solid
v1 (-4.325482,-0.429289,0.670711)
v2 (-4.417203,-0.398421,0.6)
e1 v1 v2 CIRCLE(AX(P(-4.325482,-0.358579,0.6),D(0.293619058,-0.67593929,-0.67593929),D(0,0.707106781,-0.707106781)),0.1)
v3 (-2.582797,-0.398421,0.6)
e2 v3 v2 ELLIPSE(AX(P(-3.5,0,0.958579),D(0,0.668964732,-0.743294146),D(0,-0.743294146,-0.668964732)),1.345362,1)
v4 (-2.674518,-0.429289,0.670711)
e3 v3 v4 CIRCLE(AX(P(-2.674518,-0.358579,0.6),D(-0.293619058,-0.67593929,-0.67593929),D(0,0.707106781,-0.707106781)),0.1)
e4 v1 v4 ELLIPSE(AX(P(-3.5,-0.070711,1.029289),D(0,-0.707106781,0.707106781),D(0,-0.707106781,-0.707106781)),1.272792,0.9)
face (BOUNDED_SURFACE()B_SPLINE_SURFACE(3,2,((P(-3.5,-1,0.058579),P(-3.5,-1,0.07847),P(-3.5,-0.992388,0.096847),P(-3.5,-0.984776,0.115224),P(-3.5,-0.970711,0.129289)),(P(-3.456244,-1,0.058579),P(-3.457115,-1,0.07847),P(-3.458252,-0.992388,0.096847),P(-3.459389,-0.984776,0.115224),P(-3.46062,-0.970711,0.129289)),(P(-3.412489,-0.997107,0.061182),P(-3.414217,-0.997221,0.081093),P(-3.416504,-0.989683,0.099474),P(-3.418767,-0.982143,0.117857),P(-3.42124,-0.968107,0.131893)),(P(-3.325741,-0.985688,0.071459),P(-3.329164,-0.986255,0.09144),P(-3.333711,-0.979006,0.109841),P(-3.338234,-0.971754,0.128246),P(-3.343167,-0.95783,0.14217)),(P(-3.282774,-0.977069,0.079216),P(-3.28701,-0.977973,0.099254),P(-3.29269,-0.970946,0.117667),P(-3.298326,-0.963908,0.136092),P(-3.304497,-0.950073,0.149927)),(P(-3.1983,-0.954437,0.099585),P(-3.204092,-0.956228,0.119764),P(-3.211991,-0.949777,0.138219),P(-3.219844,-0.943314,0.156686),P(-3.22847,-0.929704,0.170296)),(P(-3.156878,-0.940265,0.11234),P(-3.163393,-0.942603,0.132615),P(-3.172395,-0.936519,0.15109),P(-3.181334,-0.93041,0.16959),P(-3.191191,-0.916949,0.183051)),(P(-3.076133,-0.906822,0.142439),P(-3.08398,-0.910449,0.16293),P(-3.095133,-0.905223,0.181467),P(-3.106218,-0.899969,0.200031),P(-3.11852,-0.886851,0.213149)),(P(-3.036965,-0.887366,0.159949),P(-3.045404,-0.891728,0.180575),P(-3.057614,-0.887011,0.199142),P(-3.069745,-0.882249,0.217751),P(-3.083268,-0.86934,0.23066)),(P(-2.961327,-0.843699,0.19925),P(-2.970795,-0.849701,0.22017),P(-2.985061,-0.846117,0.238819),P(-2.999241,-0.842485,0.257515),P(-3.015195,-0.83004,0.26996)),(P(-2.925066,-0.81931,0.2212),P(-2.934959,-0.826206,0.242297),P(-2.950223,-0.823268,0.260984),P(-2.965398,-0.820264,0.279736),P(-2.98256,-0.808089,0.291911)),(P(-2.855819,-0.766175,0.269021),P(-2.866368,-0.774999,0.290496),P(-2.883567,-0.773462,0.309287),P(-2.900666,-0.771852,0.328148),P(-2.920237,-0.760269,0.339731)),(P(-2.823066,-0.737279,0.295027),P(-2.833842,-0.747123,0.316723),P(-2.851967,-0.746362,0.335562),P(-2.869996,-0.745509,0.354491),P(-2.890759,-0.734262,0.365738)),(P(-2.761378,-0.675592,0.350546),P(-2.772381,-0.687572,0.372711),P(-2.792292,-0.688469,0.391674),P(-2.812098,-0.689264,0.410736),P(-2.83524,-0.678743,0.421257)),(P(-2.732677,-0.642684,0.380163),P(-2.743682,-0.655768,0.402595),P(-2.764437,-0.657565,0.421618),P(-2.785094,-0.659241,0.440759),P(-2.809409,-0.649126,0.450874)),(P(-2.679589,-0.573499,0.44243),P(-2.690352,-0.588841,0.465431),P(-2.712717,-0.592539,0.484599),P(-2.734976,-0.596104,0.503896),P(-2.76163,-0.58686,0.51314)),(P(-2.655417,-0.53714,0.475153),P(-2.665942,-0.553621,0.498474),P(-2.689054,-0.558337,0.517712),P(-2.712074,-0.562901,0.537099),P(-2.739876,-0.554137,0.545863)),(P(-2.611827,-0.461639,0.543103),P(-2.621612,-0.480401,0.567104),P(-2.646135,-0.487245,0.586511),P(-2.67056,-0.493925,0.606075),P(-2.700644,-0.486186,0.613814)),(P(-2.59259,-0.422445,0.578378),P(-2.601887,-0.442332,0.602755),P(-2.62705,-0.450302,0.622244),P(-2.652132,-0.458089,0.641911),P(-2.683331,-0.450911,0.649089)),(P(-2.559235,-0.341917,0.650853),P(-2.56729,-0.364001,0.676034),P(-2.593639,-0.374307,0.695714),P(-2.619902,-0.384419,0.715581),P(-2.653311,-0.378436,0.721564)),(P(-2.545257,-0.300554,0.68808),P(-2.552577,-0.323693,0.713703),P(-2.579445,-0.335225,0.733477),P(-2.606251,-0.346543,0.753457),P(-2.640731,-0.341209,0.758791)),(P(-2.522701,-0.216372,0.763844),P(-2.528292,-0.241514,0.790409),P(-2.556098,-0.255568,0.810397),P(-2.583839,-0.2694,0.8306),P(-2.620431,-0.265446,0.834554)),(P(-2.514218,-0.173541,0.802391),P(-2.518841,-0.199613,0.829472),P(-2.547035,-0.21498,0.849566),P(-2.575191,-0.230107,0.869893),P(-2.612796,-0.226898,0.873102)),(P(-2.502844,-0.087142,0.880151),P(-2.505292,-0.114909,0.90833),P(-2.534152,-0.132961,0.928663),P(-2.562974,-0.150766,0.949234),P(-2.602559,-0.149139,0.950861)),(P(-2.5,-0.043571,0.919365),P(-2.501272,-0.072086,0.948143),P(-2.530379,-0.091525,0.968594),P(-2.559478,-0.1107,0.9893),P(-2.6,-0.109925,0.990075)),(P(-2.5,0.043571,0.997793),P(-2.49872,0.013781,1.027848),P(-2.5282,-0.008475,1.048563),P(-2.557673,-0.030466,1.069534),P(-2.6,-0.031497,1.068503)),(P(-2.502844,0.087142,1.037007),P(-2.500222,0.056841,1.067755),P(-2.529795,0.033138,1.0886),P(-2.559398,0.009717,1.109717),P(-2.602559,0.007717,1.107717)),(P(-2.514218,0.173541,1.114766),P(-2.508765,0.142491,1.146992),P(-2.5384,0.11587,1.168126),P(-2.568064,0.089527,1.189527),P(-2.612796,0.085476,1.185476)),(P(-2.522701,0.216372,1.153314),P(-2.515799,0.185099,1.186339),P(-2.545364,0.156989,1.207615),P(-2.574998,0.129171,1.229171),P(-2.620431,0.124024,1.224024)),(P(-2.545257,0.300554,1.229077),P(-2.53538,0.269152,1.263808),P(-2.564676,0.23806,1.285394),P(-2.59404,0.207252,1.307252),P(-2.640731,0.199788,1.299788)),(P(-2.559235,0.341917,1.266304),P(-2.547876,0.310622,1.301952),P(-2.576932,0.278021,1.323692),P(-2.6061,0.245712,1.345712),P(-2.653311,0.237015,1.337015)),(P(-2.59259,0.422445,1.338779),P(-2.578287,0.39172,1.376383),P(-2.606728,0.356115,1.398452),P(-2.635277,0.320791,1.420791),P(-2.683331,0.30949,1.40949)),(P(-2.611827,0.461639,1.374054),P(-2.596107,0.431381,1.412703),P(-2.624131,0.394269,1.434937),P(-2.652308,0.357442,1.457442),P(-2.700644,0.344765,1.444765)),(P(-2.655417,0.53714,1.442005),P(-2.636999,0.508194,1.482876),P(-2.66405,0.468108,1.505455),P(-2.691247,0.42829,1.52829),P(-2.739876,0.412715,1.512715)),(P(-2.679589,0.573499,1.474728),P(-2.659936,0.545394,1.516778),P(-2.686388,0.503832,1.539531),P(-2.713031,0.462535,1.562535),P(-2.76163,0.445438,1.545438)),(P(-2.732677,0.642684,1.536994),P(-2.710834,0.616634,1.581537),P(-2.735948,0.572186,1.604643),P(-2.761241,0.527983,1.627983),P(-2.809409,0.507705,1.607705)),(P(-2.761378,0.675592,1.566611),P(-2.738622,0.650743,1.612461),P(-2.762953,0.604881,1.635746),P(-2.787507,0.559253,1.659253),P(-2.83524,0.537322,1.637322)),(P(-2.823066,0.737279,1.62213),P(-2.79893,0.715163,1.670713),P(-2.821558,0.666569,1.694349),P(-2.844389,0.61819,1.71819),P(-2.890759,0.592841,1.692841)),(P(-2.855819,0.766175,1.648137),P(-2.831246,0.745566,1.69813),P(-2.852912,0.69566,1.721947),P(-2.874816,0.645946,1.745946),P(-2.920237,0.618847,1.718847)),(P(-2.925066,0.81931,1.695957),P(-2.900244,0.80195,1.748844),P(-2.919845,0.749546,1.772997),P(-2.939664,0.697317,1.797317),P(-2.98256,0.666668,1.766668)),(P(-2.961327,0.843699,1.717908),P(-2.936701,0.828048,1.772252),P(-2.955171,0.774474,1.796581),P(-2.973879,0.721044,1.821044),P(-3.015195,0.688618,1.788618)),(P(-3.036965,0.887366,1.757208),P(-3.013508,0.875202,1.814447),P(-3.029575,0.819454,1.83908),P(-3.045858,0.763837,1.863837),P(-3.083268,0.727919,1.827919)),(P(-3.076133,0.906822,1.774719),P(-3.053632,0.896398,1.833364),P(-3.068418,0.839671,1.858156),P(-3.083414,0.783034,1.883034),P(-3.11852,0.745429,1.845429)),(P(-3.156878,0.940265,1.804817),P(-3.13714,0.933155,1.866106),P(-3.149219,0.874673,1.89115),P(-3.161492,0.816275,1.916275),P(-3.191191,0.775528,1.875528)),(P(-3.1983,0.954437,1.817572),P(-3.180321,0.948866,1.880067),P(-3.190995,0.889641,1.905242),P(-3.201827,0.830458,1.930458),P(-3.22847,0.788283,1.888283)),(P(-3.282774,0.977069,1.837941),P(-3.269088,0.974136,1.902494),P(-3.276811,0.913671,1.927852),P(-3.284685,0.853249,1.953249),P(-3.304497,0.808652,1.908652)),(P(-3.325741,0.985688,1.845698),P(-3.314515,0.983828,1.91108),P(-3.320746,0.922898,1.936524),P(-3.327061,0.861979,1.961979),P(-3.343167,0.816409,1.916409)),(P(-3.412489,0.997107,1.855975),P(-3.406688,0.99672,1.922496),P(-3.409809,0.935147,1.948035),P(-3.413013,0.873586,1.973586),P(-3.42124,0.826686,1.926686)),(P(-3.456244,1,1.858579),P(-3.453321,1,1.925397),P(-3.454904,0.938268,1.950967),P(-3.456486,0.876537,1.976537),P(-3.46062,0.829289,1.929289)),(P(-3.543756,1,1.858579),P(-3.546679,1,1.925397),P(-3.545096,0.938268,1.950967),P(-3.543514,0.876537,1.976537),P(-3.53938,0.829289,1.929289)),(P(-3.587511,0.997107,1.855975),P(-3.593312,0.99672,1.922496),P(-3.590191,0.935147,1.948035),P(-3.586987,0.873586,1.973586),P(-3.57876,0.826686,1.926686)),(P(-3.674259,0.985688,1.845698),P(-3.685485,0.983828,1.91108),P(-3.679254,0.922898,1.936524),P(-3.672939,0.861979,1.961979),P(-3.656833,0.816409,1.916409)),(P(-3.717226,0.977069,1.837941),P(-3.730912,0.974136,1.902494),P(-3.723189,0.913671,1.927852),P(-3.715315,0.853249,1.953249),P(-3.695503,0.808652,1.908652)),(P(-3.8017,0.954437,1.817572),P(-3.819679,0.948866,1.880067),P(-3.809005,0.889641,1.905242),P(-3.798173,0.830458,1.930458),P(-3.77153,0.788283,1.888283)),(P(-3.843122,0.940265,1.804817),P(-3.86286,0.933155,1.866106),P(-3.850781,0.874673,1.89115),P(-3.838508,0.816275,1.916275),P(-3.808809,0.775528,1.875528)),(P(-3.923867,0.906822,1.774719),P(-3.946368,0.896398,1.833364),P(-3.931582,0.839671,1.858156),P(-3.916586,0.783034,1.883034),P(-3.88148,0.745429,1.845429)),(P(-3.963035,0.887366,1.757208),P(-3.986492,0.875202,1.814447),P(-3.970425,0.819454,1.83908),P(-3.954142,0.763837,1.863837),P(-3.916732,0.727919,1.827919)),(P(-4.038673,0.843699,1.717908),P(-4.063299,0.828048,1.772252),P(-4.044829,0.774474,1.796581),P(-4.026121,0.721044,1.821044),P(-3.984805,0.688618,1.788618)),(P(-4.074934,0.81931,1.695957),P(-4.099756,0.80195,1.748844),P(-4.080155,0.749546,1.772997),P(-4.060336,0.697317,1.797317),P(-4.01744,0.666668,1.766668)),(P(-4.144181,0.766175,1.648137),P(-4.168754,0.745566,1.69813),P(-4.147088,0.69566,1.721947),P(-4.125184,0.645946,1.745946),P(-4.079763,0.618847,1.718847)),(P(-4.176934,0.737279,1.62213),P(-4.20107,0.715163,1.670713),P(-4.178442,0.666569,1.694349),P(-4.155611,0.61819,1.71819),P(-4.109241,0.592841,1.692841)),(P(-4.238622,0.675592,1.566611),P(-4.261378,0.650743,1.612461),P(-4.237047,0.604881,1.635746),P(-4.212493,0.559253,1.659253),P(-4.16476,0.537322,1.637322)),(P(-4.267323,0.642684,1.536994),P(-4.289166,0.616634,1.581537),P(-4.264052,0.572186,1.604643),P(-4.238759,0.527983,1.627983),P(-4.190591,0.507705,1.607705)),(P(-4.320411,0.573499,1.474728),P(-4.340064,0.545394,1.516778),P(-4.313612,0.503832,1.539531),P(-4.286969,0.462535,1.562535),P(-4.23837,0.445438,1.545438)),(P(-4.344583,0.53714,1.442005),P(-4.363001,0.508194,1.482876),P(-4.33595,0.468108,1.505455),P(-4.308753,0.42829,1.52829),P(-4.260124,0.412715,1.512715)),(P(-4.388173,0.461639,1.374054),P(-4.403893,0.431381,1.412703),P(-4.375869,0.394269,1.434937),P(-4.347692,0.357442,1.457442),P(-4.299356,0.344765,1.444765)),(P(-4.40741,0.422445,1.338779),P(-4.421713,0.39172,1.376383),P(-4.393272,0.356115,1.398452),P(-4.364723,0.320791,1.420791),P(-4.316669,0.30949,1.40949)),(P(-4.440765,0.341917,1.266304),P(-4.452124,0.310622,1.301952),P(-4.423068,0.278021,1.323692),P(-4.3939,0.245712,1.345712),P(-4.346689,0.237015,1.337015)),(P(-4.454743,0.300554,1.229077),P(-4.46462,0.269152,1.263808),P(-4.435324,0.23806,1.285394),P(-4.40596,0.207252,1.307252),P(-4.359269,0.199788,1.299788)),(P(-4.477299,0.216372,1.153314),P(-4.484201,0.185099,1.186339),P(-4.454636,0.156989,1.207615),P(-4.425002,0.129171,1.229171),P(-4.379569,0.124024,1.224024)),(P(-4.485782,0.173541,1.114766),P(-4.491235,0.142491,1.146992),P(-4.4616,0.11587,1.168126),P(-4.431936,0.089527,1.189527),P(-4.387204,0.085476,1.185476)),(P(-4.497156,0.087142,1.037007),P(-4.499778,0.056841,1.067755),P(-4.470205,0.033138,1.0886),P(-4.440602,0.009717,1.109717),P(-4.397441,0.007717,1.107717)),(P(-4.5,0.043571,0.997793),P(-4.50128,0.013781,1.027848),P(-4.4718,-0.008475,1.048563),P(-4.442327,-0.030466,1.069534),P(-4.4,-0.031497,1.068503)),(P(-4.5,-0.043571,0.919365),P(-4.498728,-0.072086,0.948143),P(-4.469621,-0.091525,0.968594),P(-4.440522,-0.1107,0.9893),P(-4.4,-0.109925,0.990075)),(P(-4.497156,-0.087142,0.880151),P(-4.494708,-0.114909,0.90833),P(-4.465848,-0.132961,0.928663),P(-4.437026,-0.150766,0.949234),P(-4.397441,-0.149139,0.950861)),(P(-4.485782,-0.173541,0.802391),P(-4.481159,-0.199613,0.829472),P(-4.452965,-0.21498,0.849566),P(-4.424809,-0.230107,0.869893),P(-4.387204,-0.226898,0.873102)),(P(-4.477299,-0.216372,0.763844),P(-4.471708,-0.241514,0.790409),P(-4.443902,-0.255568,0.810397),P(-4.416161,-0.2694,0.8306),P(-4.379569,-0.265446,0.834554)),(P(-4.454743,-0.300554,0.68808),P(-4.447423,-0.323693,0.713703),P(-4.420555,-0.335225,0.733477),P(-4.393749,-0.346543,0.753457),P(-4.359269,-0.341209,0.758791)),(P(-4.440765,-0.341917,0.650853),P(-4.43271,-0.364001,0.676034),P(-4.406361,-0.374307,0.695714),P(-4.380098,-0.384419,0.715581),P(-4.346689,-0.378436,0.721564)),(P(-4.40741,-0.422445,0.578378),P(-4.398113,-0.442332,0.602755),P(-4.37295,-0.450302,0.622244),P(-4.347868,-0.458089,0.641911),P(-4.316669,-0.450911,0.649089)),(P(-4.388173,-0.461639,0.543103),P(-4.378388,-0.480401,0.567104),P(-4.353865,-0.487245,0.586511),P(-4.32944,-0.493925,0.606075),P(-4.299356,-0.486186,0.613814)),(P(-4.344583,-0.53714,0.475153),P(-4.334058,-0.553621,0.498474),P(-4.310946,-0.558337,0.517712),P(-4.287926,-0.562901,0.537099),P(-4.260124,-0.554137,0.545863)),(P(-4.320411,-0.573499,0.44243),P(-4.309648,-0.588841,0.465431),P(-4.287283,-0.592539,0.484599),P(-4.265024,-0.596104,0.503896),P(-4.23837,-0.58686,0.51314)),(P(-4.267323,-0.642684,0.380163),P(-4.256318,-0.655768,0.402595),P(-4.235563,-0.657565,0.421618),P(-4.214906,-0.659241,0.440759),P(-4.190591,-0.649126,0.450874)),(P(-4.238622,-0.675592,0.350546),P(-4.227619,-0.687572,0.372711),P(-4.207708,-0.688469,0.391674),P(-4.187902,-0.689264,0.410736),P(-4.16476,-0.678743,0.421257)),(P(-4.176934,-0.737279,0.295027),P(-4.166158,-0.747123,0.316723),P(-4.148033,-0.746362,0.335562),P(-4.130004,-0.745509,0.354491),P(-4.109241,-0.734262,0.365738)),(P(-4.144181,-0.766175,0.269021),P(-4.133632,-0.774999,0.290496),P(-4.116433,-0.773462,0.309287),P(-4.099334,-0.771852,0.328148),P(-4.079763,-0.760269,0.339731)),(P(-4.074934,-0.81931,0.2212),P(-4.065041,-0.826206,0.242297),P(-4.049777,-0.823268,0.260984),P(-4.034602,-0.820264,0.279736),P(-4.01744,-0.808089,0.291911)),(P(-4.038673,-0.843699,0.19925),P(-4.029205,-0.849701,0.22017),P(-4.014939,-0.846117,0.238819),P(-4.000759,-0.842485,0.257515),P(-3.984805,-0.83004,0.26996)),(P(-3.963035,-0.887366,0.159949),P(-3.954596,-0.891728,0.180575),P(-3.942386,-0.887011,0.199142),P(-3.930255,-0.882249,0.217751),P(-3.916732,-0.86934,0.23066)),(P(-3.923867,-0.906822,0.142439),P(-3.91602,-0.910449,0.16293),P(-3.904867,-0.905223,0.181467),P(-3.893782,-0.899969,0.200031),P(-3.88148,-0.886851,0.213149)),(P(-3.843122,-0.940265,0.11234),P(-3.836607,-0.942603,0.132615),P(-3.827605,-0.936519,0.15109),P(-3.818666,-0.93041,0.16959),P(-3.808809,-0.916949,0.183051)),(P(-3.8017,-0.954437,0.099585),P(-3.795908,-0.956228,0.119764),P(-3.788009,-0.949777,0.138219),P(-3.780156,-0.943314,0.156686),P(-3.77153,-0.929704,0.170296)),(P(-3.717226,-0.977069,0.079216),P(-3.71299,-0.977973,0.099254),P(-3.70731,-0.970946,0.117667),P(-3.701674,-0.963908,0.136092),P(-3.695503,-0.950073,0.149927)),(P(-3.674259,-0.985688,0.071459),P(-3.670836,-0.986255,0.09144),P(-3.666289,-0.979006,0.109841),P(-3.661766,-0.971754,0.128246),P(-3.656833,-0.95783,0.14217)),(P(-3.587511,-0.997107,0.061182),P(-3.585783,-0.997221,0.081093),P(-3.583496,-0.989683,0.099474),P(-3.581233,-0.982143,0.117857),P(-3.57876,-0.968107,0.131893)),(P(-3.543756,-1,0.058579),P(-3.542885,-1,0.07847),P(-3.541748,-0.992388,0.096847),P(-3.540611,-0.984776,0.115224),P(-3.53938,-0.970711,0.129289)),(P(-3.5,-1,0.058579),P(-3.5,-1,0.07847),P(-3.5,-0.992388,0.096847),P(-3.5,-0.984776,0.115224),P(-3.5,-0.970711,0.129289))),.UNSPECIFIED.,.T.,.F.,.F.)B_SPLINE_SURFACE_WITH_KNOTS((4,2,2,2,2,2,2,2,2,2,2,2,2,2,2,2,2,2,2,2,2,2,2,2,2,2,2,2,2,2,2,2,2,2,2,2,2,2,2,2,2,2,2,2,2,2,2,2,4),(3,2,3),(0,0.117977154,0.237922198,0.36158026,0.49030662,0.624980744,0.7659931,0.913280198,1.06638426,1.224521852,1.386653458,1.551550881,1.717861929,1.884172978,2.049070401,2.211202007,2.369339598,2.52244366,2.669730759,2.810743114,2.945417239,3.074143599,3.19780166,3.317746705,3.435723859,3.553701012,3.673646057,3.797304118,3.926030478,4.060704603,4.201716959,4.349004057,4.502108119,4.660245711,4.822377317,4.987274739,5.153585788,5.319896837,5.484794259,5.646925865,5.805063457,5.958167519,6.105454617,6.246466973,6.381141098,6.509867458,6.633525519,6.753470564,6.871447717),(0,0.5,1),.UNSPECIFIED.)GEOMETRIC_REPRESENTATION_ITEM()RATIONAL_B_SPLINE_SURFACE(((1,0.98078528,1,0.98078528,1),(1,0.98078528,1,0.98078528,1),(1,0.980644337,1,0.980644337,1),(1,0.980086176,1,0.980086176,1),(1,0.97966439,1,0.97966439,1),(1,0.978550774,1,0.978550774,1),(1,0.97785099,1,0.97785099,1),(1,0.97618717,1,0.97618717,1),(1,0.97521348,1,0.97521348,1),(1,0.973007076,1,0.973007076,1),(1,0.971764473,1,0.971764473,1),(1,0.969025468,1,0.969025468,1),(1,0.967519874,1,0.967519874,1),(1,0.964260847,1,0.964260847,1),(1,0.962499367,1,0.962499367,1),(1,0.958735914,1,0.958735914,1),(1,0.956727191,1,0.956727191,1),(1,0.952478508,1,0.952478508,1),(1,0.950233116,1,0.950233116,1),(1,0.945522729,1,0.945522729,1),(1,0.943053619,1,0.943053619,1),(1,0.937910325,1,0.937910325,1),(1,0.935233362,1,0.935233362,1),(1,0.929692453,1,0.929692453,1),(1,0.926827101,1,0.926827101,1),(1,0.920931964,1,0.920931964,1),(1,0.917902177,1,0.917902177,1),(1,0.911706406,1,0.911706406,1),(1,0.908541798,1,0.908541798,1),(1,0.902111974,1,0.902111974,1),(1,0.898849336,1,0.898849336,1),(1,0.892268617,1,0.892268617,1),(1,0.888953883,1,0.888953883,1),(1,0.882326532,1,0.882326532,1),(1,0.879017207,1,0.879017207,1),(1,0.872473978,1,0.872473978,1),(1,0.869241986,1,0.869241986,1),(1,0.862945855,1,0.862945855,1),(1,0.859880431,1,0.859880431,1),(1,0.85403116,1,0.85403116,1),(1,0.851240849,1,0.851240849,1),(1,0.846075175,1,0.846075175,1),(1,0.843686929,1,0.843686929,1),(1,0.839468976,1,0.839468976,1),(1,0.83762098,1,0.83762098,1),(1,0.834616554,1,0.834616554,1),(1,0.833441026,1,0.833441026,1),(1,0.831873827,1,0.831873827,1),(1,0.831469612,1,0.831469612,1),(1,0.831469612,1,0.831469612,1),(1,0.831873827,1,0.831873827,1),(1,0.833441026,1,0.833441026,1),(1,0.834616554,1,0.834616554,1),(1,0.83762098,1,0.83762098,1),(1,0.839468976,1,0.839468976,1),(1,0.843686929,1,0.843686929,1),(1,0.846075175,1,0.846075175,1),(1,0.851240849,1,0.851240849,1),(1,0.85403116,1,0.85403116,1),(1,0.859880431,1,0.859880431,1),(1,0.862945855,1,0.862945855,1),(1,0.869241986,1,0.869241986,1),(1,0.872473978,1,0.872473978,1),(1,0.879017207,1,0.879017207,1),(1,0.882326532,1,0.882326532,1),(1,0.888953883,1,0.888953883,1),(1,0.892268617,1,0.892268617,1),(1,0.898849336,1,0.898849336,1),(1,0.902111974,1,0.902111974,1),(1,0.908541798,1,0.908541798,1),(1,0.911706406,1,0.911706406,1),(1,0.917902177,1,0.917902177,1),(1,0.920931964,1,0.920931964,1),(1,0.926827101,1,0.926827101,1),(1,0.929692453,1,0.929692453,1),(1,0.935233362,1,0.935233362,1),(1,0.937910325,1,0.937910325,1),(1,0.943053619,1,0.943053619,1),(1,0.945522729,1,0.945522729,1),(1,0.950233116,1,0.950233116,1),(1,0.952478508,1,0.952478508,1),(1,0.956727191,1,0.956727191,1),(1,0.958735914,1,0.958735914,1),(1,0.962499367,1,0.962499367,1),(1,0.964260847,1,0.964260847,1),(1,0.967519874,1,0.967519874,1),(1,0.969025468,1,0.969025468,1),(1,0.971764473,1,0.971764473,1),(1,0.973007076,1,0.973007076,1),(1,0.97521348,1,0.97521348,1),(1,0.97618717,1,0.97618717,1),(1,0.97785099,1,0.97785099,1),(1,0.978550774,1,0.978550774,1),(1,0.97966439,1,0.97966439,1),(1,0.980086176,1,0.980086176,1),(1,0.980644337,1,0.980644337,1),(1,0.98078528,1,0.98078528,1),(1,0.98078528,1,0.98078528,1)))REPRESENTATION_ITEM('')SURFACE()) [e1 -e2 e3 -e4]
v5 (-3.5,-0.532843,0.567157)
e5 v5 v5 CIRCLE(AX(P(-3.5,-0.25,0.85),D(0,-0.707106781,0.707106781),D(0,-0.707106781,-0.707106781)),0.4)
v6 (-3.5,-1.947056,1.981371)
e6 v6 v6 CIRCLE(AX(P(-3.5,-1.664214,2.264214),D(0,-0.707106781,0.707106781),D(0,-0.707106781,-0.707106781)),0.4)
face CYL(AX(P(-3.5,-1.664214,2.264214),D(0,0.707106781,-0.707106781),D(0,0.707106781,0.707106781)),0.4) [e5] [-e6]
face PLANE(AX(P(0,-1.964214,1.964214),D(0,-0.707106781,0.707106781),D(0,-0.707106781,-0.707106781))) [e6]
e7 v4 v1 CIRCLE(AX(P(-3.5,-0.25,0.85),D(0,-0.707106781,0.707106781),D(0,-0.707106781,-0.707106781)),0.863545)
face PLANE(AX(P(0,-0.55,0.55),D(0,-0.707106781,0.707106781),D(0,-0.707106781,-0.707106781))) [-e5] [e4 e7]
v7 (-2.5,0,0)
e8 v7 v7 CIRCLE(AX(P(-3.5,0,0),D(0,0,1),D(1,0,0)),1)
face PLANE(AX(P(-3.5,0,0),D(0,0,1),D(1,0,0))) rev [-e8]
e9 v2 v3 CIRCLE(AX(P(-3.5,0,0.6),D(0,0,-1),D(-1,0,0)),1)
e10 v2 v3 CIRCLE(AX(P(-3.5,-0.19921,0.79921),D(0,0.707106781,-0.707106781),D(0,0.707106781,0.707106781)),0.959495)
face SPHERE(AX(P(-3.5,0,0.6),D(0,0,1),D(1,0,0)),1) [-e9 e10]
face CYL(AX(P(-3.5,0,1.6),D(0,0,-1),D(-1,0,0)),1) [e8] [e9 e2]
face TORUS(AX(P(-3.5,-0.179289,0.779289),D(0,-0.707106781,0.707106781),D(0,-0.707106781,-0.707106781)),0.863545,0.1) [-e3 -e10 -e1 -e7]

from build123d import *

# Parameters (mm, degrees)
SKETCH_2_R      = 1
EXTRUDE_1_DEPTH = 1.6
FILLET_2_R      = 1
FILLET_3_R      = 0.1
SKETCH_4_R      = 0.4
EXTRUDE_2_DEPTH = 2


# Read off the part's stored shape, not the designer's step: Тело-Удалить/Сохранить 1
with BuildPart() as part:
    # Эскиз2 → Бобышка-Вытянуть1 (new body)
    with BuildSketch(Plane.XY):
        with Locations((-3.5, 0)):
            Circle(SKETCH_2_R)
    extrude(amount=EXTRUDE_1_DEPTH)

    # Скругление2
    fillet_2_edges = [part.edges().sort_by_distance(p)[0] for p in [
        (-4.5, 0, 1.6),
    ]]
    fillet(fillet_2_edges, radius=FILLET_2_R)


with BuildPart() as body_2:
    # Split Bodies 1: the piece on the far side of the plane
    add(part.part)
    split(bisect_by=Plane(origin=(0, -0.55, 0.55), x_dir=(0, -0.7071067811865464, -0.7071067811865488), z_dir=(0, -0.7071067811865488, 0.7071067811865464)), keep=Keep.BOTTOM)

    # Скругление3
    fillet_3_edges = [body_2.edges().sort_by_distance(p)[0] for p in [
        (-3.853553391, 0.362372436, 1.462372436),
        (-3.499999994, -1, 0.1),
    ]]
    fillet(fillet_3_edges, radius=FILLET_3_R)

    # Эскиз4 → Бобышка-Вытянуть2 (add)
    with BuildSketch(Plane(origin=(0, -0.55, 0.55), x_dir=(1, 0, 0), z_dir=(0, -0.7071067811865487, 0.7071067811865465))):
        with Locations(Location((-3.5, 0.424264069, 0), (0, 0, 270))):
            Circle(SKETCH_4_R)
    extrude(amount=EXTRUDE_2_DEPTH)


with BuildPart() as part_1:
    add(part.part)

    # Split Bodies 1
    split(bisect_by=Plane(origin=(0, -0.55, 0.55), x_dir=(0, -0.7071067811865464, -0.7071067811865488), z_dir=(0, -0.7071067811865488, 0.7071067811865464)), keep=Keep.TOP)


solid = body_2.part
